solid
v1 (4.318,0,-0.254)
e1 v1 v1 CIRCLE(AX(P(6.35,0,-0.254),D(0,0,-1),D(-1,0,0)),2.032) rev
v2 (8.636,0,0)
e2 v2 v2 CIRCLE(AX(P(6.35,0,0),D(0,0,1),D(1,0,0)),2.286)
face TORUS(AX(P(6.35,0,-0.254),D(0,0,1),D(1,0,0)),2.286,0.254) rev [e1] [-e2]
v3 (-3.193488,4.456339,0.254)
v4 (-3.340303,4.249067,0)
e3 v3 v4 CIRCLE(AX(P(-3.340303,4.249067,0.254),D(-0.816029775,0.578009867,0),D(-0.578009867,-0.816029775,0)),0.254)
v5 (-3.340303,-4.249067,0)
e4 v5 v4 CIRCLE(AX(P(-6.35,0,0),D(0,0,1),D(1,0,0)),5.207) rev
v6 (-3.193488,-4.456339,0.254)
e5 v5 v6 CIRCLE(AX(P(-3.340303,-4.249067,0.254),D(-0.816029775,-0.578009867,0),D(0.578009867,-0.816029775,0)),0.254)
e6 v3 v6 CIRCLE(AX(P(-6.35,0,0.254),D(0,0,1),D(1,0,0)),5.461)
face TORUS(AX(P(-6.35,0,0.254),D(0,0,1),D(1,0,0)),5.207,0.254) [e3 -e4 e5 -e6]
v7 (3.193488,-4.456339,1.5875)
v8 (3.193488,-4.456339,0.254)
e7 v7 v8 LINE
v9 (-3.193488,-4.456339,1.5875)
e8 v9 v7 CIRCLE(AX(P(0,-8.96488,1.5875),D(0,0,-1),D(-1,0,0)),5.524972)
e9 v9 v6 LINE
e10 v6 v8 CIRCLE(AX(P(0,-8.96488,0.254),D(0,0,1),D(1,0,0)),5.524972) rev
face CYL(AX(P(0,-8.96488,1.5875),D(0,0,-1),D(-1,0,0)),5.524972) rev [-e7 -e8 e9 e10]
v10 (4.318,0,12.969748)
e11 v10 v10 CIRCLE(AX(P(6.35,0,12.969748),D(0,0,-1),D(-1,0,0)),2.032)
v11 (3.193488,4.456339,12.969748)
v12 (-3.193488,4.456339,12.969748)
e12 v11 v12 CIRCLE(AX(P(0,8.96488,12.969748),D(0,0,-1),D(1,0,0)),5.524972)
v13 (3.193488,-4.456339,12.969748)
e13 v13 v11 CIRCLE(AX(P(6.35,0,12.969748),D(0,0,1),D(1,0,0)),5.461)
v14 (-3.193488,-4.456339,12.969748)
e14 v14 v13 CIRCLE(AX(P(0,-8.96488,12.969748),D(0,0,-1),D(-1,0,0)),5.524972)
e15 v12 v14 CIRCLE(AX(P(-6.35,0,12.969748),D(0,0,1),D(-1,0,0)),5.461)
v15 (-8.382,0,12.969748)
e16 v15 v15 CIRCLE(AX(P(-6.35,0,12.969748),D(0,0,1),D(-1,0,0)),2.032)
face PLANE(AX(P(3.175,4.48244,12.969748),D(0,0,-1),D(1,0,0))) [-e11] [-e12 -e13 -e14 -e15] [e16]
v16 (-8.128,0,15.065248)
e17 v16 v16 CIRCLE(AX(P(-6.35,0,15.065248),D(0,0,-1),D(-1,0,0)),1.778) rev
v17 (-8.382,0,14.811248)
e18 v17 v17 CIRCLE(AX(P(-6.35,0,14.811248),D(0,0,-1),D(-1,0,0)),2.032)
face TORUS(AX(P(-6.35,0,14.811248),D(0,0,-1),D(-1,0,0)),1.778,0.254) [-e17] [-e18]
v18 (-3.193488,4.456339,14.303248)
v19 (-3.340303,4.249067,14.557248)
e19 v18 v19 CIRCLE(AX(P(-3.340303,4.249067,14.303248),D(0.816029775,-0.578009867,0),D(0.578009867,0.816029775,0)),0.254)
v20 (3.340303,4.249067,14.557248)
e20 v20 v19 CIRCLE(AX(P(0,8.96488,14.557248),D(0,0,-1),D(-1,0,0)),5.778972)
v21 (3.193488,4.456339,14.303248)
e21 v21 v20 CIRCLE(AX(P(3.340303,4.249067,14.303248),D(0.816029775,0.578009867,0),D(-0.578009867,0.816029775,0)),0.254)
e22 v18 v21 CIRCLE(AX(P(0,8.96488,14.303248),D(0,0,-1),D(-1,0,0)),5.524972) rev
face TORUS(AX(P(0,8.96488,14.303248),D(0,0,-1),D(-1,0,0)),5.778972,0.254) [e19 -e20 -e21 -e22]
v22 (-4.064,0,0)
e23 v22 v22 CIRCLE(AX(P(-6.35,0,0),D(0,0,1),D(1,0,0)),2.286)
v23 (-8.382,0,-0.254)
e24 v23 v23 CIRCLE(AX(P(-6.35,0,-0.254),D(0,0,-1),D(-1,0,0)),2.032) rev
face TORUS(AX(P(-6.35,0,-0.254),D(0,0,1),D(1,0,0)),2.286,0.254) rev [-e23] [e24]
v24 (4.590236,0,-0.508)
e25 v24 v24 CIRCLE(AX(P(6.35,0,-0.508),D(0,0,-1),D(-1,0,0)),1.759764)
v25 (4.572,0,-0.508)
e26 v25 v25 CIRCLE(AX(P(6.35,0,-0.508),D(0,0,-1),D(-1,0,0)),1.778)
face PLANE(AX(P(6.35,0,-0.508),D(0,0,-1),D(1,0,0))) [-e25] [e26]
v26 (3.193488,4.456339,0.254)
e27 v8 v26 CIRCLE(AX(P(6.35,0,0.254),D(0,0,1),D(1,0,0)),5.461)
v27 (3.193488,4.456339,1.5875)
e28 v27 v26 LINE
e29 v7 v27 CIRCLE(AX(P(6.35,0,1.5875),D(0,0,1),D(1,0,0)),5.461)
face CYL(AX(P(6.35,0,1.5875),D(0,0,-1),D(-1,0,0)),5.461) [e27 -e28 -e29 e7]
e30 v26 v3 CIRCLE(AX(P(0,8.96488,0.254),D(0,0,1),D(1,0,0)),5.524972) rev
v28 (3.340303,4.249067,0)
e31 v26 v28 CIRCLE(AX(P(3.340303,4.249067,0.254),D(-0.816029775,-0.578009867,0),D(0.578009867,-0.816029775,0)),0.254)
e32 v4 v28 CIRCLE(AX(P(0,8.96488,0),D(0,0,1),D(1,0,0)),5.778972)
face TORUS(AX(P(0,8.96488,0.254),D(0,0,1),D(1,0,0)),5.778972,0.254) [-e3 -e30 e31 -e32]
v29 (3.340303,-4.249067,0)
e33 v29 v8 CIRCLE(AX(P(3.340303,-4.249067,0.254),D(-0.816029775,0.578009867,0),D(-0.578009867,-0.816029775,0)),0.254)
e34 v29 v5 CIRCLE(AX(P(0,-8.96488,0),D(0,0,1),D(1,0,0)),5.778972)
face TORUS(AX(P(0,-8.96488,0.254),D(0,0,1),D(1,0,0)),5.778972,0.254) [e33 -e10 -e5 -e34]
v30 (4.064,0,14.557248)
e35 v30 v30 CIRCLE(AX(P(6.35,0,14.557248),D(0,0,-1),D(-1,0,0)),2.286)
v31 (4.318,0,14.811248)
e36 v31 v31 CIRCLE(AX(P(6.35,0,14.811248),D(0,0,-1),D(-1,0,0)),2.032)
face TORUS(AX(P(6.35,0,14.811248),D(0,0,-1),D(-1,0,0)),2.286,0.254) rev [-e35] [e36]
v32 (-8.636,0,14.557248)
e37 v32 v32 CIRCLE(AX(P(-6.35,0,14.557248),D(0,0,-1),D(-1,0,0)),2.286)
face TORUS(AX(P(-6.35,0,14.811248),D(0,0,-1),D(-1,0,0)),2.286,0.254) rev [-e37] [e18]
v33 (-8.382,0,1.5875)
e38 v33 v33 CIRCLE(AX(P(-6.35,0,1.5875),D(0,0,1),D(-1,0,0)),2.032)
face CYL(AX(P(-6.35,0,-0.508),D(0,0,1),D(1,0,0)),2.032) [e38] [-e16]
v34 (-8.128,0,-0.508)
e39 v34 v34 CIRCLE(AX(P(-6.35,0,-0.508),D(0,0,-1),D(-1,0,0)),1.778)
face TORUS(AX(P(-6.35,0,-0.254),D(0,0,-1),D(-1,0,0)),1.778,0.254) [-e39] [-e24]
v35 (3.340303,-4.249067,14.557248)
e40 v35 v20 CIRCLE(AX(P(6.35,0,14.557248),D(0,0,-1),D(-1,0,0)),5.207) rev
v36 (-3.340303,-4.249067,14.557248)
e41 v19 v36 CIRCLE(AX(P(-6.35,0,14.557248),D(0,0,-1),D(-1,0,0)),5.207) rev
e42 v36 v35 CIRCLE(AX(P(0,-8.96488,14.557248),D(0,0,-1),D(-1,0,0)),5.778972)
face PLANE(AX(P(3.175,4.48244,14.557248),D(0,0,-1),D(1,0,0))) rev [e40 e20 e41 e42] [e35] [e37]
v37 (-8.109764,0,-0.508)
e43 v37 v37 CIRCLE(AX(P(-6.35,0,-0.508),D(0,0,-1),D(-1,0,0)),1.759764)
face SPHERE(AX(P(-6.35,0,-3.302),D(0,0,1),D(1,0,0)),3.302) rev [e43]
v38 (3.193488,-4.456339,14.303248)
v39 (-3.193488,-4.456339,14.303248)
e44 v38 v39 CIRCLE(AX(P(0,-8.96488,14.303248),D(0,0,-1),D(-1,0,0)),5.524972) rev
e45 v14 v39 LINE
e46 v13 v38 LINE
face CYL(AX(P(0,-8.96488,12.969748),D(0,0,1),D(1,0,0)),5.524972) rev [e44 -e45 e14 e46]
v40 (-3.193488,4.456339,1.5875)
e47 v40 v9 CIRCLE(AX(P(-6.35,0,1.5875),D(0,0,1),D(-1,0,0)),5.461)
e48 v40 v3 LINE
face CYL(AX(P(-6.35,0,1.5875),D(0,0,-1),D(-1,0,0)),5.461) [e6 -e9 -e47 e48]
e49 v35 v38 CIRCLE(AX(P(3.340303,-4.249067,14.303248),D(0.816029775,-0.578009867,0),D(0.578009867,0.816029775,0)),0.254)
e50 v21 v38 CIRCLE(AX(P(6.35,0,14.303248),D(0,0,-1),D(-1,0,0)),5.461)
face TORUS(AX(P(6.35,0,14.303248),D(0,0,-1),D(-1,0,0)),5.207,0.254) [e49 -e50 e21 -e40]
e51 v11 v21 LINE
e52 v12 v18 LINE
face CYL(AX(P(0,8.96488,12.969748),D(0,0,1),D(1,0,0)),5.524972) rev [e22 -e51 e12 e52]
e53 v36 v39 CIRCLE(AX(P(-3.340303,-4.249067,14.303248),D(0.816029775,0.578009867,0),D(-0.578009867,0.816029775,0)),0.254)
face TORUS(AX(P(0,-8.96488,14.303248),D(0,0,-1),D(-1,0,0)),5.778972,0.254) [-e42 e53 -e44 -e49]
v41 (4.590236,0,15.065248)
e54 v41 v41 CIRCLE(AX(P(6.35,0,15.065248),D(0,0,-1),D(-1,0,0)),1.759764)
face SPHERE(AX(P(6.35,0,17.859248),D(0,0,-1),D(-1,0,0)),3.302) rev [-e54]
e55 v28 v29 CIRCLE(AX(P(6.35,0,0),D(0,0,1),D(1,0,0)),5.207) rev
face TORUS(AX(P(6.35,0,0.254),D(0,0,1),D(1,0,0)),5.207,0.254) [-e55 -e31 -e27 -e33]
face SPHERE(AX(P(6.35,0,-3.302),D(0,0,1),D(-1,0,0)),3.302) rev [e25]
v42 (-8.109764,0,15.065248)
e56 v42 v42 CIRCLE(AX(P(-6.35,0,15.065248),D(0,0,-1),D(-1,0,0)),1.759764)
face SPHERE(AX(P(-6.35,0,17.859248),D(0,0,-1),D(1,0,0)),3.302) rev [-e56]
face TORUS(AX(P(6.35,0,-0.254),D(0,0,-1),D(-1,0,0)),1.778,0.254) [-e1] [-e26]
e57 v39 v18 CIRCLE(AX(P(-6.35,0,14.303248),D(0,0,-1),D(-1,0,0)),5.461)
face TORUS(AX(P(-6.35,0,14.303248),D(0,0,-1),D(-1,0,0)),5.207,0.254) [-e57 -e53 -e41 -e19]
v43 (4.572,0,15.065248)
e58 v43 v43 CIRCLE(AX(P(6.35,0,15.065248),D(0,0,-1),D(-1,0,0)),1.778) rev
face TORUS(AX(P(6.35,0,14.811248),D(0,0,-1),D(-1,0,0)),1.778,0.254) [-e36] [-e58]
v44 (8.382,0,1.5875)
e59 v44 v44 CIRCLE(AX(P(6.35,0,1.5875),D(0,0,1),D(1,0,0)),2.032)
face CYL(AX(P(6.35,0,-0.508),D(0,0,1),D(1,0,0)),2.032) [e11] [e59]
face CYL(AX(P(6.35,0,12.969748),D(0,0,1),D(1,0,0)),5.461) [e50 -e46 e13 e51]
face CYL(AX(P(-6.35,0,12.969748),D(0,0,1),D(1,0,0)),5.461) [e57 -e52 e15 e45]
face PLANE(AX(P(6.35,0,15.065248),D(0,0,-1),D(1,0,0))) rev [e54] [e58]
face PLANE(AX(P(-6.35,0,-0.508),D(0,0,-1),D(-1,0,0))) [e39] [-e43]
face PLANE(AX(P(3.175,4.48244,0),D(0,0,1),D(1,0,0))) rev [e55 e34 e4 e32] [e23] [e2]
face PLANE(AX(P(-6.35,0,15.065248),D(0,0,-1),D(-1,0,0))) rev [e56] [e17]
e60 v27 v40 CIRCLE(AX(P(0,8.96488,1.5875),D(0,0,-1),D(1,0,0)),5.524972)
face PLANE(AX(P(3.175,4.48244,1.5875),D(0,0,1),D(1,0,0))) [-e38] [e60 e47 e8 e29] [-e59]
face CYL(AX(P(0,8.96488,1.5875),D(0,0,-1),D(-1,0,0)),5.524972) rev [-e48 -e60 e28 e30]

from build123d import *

# Parameters (mm, degrees)
SKETCH1_R           = 2.032
BOSS_EXTRUDE1_DEPTH = 1.5875
BOSS_EXTRUDE2_START = 0.508
SKETCH2_R           = 2.032
BOSS_EXTRUDE2_DEPTH = 15.573248
FILLET1_R           = 0.254
FILLET2_R           = 0.254


with BuildPart() as part:
    # Sketch1 → Boss-Extrude1 (new body)
    with BuildSketch(Plane.XY):
        with BuildLine():
            ThreePointArc((3.193488118, -4.456338602), (11.811, 0), (3.193488118, 4.456338602))
            ThreePointArc((3.193488118, 4.456338602), (0, 3.439908329), (-3.193488118, 4.456338602))
            ThreePointArc((-3.193488118, 4.456338602), (-11.811, 0), (-3.193488118, -4.456338602))
            ThreePointArc((-3.193488118, -4.456338602), (0, -3.439908329), (3.193488118, -4.456338602))
        make_face()
        with Locations((6.35, 0)):
            Circle(SKETCH1_R, mode=Mode.SUBTRACT)
        with Locations(Location((-6.35, 0, 0), (0, 0, 180))):
            Circle(SKETCH1_R, mode=Mode.SUBTRACT)
    boss_extrude1 = extrude(amount=BOSS_EXTRUDE1_DEPTH)

    # Sketch2 → Boss-Extrude2 (add)
    with BuildSketch(Plane(origin=(0, 0, 0), x_dir=(-1, 0, 0), z_dir=(0, 0, -1)).offset(BOSS_EXTRUDE2_START)):
        with Locations(Location((6.35, 0, 0), (0, 0, 180))):
            Circle(SKETCH2_R)
    boss_extrude2 = extrude(amount=-BOSS_EXTRUDE2_DEPTH)

    # Mirror1: Boss-Extrude1 across plane
    add(boss_extrude1.mirror(Plane(origin=(0, 0, 7.278624), x_dir=(1, 0, 0), z_dir=(0, 0, -1))))

    # Sketch3 → Cut-Revolve1 (revolve, cut)
    with BuildSketch(Plane(origin=(0, 0, 0), x_dir=(1, 0, 0), z_dir=(0, 1, 0))):
        with BuildLine():
            Line((-6.35, -14.557248), (-6.35, -15.379780772))
            Line((-6.35, -15.379780772), (-8.530698573, -15.379780772))
            ThreePointArc((-8.530698573, -15.379780772), (-7.51533326, -14.769716904), (-6.35, -14.557248))
        make_face()
    cut_revolve1 = revolve(axis=Axis((-6.35, 0, 14.557248), (0, 0, 1)), mode=Mode.SUBTRACT)

    # Mirror2: Boss-Extrude2, Cut-Revolve1 across plane
    add(boss_extrude2.mirror(Plane(origin=(0, 0, 0), x_dir=(0, 0, 1), z_dir=(1, 0, 0))))
    add(cut_revolve1.mirror(Plane(origin=(0, 0, 0), x_dir=(0, 0, 1), z_dir=(1, 0, 0))), mode=Mode.SUBTRACT)

    # Mirror3: Cut-Revolve1 across plane
    add(cut_revolve1.mirror(Plane(origin=(0, 0, 7.278624), x_dir=(1, 0, 0), z_dir=(0, 0, -1))), mode=Mode.SUBTRACT)

    # Mirror4 copy 1 sketch → Mirror4 copy 1 (revolve, cut)
    with BuildSketch(Plane(origin=(0, 0, 14.557248), x_dir=(-1, 0, 0), z_dir=(0, 1, 0))):
        with BuildLine():
            Line((-6.35, -14.557248), (-6.35, -15.379780772))
            Line((-6.35, -15.379780772), (-8.530698573, -15.379780772))
            ThreePointArc((-8.530698573, -15.379780772), (-7.51533326, -14.769716904), (-6.35, -14.557248))
        make_face()
    revolve(axis=Axis((6.35, 0, 0), (0, 0, -1)), mode=Mode.SUBTRACT)

    # Mirror4 copy 2 sketch → Mirror4 copy 2 (revolve, cut)
    with BuildSketch(Plane(origin=(0, 0, 0), x_dir=(-1, 0, 0), z_dir=(0, 1, 0))):
        with BuildLine():
            Line((-6.35, 14.557248), (-6.35, 15.379780772))
            Line((-6.35, 15.379780772), (-8.530698573, 15.379780772))
            ThreePointArc((-8.530698573, 15.379780772), (-7.51533326, 14.769716904), (-6.35, 14.557248))
        make_face()
    revolve(axis=Axis((6.35, 0, 14.557248), (0, 0, -1)), mode=Mode.SUBTRACT)

    # Fillet1
    fillet1_edges = [part.edges().sort_by_distance(p)[0] for p in [
        (-8.382, 0, 15.065248),
        (-8.382, 0, -0.508),
        (8.382, 0, -0.508),
        (8.382, 0, 15.065248),
    ]]
    fillet(fillet1_edges, radius=FILLET1_R)

    # Fillet2
    fillet2_edges = [part.edges().sort_by_distance(p)[0] for p in [
        (-8.382, 0, 0),
        (-8.382, 0, 14.557248),
        (0, 3.439908329, 14.557248),
        (-11.811, 0, 14.557248),
        (0, -3.439908329, 14.557248),
        (11.811, 0, 14.557248),
        (8.382, 0, 14.557248),
        (11.811, 0, 0),
        (8.382, 0, 0),
        (0, -3.439908329, 0),
        (-11.811, 0, 0),
        (0, 3.439908329, 0),
    ]]
    fillet(fillet2_edges, radius=FILLET2_R - 0.0001)  # a hair under: the kernel refuses the full size


solid = part.part
